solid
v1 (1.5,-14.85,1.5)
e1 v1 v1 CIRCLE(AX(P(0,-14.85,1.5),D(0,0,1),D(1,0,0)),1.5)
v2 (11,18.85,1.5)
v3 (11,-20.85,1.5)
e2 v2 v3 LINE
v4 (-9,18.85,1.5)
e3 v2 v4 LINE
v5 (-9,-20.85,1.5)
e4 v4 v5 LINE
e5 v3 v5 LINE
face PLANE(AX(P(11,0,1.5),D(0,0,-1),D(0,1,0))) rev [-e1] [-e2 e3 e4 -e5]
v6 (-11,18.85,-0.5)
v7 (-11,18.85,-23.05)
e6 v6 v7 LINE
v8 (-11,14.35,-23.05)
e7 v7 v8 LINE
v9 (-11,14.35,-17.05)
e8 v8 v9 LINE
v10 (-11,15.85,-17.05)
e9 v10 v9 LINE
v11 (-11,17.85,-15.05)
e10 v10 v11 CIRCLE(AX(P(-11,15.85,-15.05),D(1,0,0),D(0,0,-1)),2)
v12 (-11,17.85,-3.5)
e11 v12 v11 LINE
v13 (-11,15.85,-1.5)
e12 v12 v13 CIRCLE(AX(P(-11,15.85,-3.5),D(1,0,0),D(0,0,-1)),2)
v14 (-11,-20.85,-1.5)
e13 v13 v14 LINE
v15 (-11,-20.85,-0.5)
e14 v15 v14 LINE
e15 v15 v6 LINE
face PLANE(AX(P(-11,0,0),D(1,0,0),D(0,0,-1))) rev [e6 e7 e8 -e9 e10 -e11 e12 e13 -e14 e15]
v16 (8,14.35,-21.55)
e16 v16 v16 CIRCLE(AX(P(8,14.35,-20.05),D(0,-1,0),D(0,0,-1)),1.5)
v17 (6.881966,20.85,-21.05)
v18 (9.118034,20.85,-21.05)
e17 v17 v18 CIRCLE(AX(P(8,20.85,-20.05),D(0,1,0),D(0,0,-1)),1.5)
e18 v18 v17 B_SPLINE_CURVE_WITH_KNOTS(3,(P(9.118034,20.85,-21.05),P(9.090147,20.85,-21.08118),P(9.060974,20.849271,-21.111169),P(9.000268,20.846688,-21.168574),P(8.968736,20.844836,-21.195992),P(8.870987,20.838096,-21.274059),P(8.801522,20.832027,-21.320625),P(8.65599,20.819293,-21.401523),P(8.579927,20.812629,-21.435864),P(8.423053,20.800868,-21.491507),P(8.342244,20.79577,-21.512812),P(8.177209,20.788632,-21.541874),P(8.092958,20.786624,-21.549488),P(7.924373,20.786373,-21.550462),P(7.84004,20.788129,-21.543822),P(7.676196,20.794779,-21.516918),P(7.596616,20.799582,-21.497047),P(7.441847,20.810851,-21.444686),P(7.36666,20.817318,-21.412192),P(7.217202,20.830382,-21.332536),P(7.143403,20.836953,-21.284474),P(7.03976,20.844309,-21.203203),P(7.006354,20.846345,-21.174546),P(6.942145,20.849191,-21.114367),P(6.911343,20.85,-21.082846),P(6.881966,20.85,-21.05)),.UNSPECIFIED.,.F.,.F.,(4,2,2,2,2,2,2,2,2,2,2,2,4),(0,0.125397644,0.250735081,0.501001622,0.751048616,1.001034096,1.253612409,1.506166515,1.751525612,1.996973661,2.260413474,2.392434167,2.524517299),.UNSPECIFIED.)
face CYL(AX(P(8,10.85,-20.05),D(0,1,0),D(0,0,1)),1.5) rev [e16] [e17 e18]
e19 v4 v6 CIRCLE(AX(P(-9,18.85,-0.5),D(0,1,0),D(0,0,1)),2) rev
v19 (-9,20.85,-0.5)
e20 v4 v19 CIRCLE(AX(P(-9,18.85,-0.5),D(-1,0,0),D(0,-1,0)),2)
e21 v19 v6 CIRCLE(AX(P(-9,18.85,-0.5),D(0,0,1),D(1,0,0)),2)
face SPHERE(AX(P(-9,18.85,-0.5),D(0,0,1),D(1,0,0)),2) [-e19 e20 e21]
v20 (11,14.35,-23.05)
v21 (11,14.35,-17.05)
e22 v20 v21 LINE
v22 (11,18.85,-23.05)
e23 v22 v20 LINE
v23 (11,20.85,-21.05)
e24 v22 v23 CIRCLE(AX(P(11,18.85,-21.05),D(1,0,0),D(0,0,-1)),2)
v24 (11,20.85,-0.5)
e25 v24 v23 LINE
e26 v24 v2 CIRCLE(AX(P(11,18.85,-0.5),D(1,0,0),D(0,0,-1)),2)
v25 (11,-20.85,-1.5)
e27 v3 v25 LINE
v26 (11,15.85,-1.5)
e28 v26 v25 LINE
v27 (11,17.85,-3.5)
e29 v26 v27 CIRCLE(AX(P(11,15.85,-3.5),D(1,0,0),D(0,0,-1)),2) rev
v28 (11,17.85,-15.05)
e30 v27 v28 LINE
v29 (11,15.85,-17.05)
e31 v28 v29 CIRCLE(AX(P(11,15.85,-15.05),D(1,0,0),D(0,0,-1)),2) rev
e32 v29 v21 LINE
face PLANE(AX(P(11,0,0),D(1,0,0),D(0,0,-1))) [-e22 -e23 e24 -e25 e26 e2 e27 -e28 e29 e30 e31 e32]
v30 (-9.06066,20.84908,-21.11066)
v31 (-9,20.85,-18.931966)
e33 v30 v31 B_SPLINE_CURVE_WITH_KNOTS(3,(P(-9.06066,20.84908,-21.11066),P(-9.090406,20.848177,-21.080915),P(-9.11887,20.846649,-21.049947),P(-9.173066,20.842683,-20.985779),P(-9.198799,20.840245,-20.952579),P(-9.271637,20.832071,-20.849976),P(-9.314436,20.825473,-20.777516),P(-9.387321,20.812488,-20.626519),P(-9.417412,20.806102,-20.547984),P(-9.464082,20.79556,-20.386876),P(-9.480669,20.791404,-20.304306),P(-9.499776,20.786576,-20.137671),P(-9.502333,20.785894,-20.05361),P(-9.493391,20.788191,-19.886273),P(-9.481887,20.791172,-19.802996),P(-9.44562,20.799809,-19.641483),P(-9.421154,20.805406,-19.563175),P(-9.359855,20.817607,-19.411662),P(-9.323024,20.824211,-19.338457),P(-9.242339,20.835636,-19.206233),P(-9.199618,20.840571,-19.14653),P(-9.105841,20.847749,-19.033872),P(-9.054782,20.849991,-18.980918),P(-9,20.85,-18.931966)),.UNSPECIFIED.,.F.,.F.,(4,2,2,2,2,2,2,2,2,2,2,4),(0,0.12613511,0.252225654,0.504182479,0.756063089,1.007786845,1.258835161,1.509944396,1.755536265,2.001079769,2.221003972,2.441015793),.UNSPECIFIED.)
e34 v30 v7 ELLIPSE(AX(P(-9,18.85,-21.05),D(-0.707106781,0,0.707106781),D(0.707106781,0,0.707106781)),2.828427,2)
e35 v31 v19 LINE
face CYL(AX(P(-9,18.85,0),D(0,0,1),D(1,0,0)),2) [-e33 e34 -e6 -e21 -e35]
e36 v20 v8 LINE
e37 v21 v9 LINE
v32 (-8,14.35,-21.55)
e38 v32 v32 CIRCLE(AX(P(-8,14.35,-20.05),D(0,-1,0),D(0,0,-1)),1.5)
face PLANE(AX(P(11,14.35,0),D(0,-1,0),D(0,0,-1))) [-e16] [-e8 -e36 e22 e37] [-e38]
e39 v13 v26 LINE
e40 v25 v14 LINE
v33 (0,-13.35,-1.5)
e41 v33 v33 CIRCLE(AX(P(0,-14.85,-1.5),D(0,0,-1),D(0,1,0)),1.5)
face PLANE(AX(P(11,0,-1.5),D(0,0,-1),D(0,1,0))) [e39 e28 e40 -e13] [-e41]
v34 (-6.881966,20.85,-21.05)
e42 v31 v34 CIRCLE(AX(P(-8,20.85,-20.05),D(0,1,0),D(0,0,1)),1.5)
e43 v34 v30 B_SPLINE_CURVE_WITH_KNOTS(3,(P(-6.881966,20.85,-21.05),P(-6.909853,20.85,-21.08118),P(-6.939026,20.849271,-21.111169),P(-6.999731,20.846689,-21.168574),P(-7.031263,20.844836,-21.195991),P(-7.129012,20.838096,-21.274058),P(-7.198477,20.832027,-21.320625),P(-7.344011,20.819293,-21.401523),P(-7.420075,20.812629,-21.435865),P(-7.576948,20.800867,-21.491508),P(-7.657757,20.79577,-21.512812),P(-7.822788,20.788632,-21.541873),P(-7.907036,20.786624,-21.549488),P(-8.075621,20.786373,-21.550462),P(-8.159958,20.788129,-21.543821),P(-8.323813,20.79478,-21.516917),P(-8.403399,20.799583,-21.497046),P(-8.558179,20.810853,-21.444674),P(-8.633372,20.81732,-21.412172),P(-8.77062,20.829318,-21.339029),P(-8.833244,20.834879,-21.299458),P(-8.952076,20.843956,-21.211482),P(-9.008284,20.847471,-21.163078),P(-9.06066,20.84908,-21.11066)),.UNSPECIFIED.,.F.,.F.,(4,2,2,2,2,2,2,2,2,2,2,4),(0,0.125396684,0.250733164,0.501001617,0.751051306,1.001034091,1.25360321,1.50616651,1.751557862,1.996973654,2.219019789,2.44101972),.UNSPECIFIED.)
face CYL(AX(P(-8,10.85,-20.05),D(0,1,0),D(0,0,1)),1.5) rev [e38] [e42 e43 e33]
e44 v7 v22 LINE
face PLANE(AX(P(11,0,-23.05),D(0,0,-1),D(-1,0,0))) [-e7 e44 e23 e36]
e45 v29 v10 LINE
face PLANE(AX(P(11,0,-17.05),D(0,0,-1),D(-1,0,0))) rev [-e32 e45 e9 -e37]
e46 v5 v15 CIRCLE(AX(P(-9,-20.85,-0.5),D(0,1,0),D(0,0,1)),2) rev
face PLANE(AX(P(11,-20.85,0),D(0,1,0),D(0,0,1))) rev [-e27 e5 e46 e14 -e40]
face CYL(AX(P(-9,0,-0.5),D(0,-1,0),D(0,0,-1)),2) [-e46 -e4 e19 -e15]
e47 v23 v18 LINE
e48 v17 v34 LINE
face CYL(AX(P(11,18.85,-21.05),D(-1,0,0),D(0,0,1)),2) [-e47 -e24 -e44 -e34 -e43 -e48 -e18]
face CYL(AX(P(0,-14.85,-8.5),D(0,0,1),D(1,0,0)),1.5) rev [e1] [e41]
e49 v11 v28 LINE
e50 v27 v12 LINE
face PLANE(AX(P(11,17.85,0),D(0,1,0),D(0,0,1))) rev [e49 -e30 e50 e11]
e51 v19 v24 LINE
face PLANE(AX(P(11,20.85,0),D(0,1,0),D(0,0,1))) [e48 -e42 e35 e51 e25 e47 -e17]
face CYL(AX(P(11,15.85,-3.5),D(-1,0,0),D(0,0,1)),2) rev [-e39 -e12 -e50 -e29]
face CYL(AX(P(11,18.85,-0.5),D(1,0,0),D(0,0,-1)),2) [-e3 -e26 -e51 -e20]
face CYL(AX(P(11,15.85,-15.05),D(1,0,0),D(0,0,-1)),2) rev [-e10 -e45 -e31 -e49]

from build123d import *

# Parameters (mm, degrees)
SKETCH1_W           = 3
SKETCH1_H           = 38.7
SKETCH1_H_2         = 3
SKETCH1_W_2         = 6
SKETCH1_H_3         = 3.5
BOSS_EXTRUDE1_DEPTH = 11
SKETCH2_R           = 1.5
CUT_EXTRUDE1_DEPTH  = 10
SKETCH3_R           = 1.5
CUT_EXTRUDE2_DEPTH  = 10
FILLET1_R           = 2


with BuildPart() as part:
    # Sketch1 → Boss-Extrude1 (new, symmetric)
    with BuildSketch(Plane(origin=(0, 0, 0), x_dir=(0, 0, -1), z_dir=(1, 0, 0))):
        with Locations((0, -1.5)):
            Rectangle(SKETCH1_W, SKETCH1_H)
        with Locations((0, 19.35)):
            Rectangle(SKETCH1_W, SKETCH1_H_2)
        Polygon((23.05, 20.85), (1.5, 20.85), (1.5, 17.85), (17.035825545, 17.85), (17.05, 17.85), (23.05, 17.85), align=None)
        with Locations((20.05, 16.1)):
            Rectangle(SKETCH1_W_2, SKETCH1_H_3)
    extrude(amount=BOSS_EXTRUDE1_DEPTH, both=True)

    # Sketch2 → Cut-Extrude1 (cut)
    with BuildSketch(Plane.XY.offset(1.5)):
        with Locations((0, -14.85)):
            Circle(SKETCH2_R)
    extrude(amount=-CUT_EXTRUDE1_DEPTH, mode=Mode.SUBTRACT)

    # Sketch3 → Cut-Extrude2 (cut)
    with BuildSketch(Plane(origin=(0, 20.85, 0), x_dir=(1, 0, 0), z_dir=(0, 1, 0))):
        with Locations(Location((-8, 20.05, 0), (0, 0, 270))):
            Circle(SKETCH3_R)
        with Locations(Location((8, 20.05, 0), (0, 0, 90))):
            Circle(SKETCH3_R)
    extrude(amount=-CUT_EXTRUDE2_DEPTH, mode=Mode.SUBTRACT)

    # Fillet1
    # the kernel refuses this fillet: 2 mm, written as the material it adds along each edge
    with BuildSketch(Plane(origin=(-11, 17.85, -17.05), x_dir=(0, 0, 1), z_dir=(1, 0, 0)), Plane(origin=(-11, 17.85, -1.5), x_dir=(0, -1, 0), z_dir=(1, 0, 0))) as fillet1_piece_1:
        with BuildLine():
            CenterArc((FILLET1_R, FILLET1_R), FILLET1_R, 180, 90)
            Line((0, FILLET1_R), (0, 0))
            Line((0, 0), (FILLET1_R, 0))
        make_face()
    extrude(amount=22)
    # the kernel refuses this fillet: 2 mm, written as the material it takes off along each edge
    with BuildSketch(Plane(origin=(-9, 18.85, -0.5), x_dir=(-1, 0, 0), z_dir=(0, 0, 1))) as fillet1_2_piece_1_section:
        Polygon((0, 0), (FILLET1_R, 0), (FILLET1_R, -FILLET1_R), (0, -FILLET1_R), align=None)
    fillet1_2_piece_1 = extrude(amount=FILLET1_R, mode=Mode.PRIVATE)
    fillet1_2_piece_1 = fillet1_2_piece_1 - Plane(origin=(-9, 18.85, -0.5), x_dir=(0.7071067811865475, -0.7071067811865475, 0), z_dir=(0, 0, 1)) * Sphere(FILLET1_R, mode=Mode.PRIVATE)
    add(fillet1_2_piece_1, mode=Mode.SUBTRACT)
    with BuildSketch(Plane(origin=(-11, 18.85, 1.5), x_dir=(1, 0, 0), z_dir=(0, -1, 0))) as fillet1_2_piece_2:
        with BuildLine():
            CenterArc((FILLET1_R, -FILLET1_R), FILLET1_R, 90, 90)
            Line((0, -FILLET1_R), (0, 0))
            Line((0, 0), (FILLET1_R, 0))
        make_face()
    extrude(amount=44.7, mode=Mode.SUBTRACT)
    with BuildSketch(Plane(origin=(-11, 20.85, -28.05), x_dir=(0, -1, 0), z_dir=(0, 0, 1))) as fillet1_2_piece_3:
        with BuildLine():
            CenterArc((FILLET1_R, FILLET1_R), FILLET1_R, 180, 90)
            Line((0, FILLET1_R), (0, 0))
            Line((0, 0), (FILLET1_R, 0))
        make_face()
    extrude(amount=27.55, mode=Mode.SUBTRACT)
    with BuildSketch(Plane(origin=(16, 20.85, 1.5), x_dir=(0, -1, 0), z_dir=(-1, 0, 0))) as fillet1_2_piece_4:
        with BuildLine():
            CenterArc((FILLET1_R, -FILLET1_R), FILLET1_R, 90, 90)
            Line((0, -FILLET1_R), (0, 0))
            Line((0, 0), (FILLET1_R, 0))
        make_face()
    extrude(amount=25, mode=Mode.SUBTRACT)
    with BuildSketch(Plane(origin=(16, 20.85, -23.05), x_dir=(0, 0, 1), z_dir=(-1, 0, 0))) as fillet1_2_piece_5:
        with BuildLine():
            CenterArc((FILLET1_R, -FILLET1_R), FILLET1_R, 90, 90)
            Line((0, -FILLET1_R), (0, 0))
            Line((0, 0), (FILLET1_R, 0))
        make_face()
    extrude(amount=32, mode=Mode.SUBTRACT)


solid = part.part
